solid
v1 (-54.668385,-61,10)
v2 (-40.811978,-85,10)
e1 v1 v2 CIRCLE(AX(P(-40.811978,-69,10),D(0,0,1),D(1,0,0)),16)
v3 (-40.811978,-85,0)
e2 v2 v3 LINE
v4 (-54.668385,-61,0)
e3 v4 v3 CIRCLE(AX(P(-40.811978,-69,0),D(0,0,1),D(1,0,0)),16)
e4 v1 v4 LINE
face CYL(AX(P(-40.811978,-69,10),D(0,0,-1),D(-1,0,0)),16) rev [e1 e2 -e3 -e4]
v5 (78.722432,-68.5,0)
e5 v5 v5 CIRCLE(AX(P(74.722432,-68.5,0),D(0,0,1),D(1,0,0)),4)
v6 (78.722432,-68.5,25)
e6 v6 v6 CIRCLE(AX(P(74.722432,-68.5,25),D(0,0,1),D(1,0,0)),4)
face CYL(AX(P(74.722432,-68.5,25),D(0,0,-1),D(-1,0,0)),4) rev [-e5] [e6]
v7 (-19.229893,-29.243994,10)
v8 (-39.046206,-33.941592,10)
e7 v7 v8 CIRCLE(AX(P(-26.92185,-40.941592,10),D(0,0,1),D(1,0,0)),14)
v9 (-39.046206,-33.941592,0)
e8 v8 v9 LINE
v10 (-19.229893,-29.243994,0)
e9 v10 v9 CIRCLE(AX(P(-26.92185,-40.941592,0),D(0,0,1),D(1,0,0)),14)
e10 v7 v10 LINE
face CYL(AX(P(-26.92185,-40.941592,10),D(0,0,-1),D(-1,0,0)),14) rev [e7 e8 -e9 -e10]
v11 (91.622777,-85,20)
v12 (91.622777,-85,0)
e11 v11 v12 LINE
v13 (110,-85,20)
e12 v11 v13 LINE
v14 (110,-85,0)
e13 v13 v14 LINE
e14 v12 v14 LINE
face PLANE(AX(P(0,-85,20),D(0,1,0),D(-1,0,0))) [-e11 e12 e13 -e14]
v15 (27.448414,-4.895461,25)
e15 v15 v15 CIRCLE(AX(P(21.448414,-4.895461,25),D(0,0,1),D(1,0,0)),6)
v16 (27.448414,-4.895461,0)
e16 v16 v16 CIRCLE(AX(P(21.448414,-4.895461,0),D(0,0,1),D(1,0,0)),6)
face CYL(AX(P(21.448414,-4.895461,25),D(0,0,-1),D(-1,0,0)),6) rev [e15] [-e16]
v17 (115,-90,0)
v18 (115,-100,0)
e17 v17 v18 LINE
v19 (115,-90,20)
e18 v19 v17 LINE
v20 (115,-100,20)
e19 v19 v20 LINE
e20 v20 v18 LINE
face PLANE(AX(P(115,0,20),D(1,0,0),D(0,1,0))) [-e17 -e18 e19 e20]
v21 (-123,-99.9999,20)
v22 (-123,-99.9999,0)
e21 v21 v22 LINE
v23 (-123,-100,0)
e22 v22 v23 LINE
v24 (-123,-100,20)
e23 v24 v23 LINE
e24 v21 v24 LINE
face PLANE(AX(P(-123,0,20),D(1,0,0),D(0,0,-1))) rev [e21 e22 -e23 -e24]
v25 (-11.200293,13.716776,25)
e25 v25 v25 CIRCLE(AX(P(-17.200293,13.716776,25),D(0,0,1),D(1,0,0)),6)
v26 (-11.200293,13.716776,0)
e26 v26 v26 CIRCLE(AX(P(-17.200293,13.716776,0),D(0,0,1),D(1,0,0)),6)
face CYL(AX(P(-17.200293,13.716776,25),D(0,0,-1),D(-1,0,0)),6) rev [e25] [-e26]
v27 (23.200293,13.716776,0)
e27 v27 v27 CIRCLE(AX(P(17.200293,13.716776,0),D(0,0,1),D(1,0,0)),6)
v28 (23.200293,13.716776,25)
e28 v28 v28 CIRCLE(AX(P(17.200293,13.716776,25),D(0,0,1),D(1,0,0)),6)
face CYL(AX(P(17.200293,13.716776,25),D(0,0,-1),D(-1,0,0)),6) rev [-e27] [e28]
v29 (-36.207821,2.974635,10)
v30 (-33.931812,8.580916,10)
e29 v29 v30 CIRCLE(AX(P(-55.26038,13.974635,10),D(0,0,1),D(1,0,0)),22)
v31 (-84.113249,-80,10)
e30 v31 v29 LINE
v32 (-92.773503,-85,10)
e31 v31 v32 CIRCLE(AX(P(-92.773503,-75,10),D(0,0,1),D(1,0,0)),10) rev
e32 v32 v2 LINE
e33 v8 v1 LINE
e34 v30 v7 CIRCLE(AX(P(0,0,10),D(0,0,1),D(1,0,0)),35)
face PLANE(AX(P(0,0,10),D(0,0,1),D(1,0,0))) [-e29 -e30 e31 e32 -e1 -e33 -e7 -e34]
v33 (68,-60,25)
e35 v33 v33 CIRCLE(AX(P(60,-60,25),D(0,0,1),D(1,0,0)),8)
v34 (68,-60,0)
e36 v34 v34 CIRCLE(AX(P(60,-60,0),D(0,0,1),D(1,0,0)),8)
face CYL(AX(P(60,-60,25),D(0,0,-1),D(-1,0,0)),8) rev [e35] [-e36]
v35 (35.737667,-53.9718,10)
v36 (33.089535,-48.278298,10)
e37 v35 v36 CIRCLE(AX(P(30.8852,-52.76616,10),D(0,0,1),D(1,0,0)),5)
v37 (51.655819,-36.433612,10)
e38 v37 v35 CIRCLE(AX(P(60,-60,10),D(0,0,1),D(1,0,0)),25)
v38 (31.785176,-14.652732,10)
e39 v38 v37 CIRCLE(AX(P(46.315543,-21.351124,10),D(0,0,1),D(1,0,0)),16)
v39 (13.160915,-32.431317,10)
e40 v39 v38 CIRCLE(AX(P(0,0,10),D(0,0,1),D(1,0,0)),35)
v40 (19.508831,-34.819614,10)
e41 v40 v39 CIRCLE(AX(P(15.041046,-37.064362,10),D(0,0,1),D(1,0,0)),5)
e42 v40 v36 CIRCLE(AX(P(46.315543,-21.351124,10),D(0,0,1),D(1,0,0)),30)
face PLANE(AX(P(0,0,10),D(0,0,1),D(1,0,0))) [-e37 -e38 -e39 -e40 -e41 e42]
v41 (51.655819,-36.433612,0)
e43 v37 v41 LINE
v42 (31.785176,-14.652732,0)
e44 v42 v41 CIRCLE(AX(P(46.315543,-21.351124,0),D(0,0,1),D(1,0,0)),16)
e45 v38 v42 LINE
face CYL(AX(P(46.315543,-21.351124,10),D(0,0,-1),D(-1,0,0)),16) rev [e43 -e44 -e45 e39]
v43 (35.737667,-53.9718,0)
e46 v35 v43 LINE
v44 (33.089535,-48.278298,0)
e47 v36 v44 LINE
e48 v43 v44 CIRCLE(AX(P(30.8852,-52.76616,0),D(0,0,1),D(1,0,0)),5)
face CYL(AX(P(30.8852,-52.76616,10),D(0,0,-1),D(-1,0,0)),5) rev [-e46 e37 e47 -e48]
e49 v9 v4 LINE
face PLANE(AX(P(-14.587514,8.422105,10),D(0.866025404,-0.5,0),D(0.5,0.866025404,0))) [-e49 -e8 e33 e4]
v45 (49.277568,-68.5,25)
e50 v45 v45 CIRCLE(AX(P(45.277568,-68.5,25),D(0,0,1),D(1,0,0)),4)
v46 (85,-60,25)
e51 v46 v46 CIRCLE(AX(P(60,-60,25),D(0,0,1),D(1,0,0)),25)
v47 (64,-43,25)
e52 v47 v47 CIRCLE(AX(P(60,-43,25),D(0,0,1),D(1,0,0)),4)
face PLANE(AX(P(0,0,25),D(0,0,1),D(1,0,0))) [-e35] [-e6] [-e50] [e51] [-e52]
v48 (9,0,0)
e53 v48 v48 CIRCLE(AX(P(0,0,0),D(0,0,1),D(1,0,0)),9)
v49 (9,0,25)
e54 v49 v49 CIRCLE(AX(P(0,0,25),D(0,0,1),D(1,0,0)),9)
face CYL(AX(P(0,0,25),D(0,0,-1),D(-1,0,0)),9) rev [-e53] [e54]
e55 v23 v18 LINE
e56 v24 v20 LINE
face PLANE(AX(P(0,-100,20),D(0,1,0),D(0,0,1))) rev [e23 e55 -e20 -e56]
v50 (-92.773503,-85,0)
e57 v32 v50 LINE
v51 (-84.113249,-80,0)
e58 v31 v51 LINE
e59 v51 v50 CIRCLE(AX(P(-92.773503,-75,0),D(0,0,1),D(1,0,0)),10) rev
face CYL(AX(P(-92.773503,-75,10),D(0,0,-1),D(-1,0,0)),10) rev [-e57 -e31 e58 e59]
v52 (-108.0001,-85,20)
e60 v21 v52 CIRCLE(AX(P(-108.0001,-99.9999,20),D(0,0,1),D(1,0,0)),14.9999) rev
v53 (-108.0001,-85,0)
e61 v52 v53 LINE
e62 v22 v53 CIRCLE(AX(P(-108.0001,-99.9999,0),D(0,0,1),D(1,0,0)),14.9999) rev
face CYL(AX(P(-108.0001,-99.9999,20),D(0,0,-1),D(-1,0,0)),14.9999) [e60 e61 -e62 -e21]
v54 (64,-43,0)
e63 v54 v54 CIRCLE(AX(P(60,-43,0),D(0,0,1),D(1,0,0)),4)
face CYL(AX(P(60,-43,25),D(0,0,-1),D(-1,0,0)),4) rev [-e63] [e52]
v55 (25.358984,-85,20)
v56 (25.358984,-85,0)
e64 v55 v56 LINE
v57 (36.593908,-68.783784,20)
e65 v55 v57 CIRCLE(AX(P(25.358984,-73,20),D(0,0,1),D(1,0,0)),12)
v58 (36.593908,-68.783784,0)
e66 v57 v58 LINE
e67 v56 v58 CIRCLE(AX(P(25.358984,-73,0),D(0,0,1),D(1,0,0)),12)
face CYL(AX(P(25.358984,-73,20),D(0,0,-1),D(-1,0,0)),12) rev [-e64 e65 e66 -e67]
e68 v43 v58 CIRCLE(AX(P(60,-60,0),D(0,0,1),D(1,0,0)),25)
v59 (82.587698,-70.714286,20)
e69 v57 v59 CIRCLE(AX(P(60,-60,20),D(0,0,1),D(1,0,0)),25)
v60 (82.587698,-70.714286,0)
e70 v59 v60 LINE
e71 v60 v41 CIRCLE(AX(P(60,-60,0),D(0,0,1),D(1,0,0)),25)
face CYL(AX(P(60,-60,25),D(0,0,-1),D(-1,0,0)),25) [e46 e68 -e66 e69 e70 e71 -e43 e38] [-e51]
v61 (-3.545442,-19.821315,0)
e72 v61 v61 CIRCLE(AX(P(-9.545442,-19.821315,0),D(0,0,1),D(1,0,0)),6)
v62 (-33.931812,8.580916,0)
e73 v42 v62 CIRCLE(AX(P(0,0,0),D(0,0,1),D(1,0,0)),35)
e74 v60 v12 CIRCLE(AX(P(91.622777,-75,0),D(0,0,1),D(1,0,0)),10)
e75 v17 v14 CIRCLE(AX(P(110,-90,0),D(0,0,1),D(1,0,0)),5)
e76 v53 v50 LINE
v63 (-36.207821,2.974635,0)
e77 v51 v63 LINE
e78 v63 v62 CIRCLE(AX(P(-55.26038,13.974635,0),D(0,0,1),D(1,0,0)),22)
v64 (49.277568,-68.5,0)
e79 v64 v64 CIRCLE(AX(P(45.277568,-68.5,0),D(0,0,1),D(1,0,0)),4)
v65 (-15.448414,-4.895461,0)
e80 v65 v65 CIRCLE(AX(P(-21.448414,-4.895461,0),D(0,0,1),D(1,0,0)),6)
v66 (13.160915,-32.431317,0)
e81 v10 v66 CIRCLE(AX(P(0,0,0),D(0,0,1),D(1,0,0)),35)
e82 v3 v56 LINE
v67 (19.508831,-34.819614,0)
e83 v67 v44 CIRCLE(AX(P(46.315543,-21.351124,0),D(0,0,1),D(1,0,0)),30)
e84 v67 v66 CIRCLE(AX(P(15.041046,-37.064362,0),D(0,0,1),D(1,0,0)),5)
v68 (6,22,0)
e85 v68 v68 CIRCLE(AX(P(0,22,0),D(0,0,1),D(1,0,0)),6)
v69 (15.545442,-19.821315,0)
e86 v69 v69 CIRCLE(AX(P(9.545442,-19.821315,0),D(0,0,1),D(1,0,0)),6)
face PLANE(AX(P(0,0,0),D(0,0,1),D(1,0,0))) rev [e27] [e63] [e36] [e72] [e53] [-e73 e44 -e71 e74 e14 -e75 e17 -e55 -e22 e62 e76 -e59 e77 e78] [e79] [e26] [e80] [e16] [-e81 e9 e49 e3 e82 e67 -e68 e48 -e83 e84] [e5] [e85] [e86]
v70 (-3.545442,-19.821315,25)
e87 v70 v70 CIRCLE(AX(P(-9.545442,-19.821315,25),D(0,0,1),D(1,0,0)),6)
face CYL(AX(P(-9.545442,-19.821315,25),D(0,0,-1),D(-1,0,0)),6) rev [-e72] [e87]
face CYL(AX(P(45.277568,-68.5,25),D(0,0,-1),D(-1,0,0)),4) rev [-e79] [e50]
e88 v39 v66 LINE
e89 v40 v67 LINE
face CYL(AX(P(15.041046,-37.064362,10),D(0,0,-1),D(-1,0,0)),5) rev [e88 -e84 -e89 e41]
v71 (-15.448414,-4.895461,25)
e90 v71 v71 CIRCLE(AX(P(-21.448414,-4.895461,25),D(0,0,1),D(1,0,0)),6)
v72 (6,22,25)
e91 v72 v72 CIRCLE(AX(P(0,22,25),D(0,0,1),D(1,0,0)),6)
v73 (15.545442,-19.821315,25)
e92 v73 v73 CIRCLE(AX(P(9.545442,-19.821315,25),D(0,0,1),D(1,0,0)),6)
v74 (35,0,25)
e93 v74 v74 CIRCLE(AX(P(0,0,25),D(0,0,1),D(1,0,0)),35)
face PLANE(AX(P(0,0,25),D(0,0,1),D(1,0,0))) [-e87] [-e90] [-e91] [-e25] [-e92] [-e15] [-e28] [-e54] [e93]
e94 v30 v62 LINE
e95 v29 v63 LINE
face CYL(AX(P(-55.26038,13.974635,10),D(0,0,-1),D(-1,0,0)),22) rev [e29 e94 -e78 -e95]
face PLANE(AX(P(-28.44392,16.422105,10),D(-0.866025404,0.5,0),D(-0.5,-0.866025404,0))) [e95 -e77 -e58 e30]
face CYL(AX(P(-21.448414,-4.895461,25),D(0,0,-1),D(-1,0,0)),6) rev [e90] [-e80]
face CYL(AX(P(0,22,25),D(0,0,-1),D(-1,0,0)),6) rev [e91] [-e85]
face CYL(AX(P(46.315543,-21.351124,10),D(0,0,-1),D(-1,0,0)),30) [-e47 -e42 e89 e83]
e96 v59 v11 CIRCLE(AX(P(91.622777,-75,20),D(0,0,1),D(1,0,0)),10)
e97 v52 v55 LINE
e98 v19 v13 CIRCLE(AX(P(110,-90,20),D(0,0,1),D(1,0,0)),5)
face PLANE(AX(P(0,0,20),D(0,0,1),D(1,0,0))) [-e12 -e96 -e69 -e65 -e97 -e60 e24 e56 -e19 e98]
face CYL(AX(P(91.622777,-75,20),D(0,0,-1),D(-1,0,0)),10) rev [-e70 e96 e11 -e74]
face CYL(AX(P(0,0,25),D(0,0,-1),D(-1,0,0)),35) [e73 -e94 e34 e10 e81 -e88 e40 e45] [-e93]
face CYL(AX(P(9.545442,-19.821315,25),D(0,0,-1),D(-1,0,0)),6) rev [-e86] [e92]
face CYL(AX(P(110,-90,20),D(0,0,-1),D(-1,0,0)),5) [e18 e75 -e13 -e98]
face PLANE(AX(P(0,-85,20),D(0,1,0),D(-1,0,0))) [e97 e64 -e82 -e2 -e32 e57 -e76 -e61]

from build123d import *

# Parameters (mm, degrees)
EXTRUDE_1_DEPTH   = 10
EXTRUDE_1_2_DEPTH = 10
EXTRUDE_2_DEPTH   = 20
SKETCH_1_4_R      = 35
SKETCH_1_4_R_2    = 6
SKETCH_1_4_R_3    = 9
SKETCH_1_4_R_4    = 25
SKETCH_1_4_R_5    = 8
SKETCH_1_4_R_6    = 4
EXTRUDE_3_DEPTH   = 25


# Read off the part's stored shape, not the designer's step: Бобышка-Вытянуть2
with BuildPart() as part:
    # Эскиз1 → Бобышка-Вытянуть1 (new body)
    with BuildSketch(Plane.XY):
        with BuildLine():
            ThreePointArc((-84.113248654, -80), (-87.773502692, -83.660254038), (-92.773502692, -85))
            Line((-92.773502692, -85), (-68.524791386, -85))
            Line((-68.524791386, -85), (-40.811978465, -85))
            ThreePointArc((-40.811978465, -85), (-54.668384925, -77), (-54.668384925, -61))
            Line((-54.668384925, -61), (-39.046205937, -33.941592266))
            ThreePointArc((-39.046205937, -33.941592266), (-30.151152872, -27.319125354), (-19.22989306, -29.243994476))
            ThreePointArc((-19.22989306, -29.243994476), (-32.622426184, -12.679799284), (-33.931812223, 8.580915992))
            ThreePointArc((-33.931812223, 8.580915992), (-34.876159455, 5.699155379), (-36.207821023, 2.974634616))
            Line((-36.207821023, 2.974634616), (-84.113248654, -80))
        make_face()
    extrude(amount=EXTRUDE_1_DEPTH)

    # Бобышка-Вытянуть2 outline → Бобышка-Вытянуть2 (add)
    with BuildSketch(Plane.XY):
        with BuildLine():
            ThreePointArc((91.622776602, -85), (83.171234054, -80.345224838), (82.587697573, -70.714285714))
            ThreePointArc((82.587697573, -70.714285714), (58.951595602, -84.978007291), (36.593908006, -68.783783784))
            ThreePointArc((36.593908006, -68.783783784), (35.222923087, -79.833937569), (25.358983849, -85))
            Line((25.358983849, -85), (-108.0001, -85))
            ThreePointArc((-108.0001, -85), (-118.606631007, -89.393368993), (-123, -99.9999))
            Line((-123, -99.9999), (115, -100))
            Line((115, -100), (115, -90))
            ThreePointArc((115, -90), (113.535533906, -86.464466094), (110, -85))
            Line((110, -85), (91.622776602, -85))
        make_face()
    extrude(amount=EXTRUDE_2_DEPTH)



with BuildPart() as body_2:
    # Эскиз1 → Extrude 1 2 (new body)
    with BuildSketch(Plane.XY):
        with BuildLine():
            ThreePointArc((33.089534913, -48.278298017), (35.418808442, -50.657512303), (35.737666875, -53.971800326))
            ThreePointArc((35.737666875, -53.971800326), (41.48802535, -43.198012184), (51.655818839, -36.433612056))
            ThreePointArc((51.655818839, -36.433612056), (34.49538534, -32.134623915), (31.785176497, -14.652732))
            ThreePointArc((31.785176497, -14.652732), (24.167277738, -25.316845908), (13.16091541, -32.431316741))
            ThreePointArc((13.16091541, -32.431316741), (16.80172204, -32.384616215), (19.508831427, -34.819613673))
            ThreePointArc((19.508831427, -34.819613673), (25.198282119, -42.659837887), (33.089534913, -48.278298017))
        make_face()
    extrude(amount=EXTRUDE_1_2_DEPTH)


with BuildPart() as part_1:
    add(part.part)

    add(body_2.part)  # Бобышка-Вытянуть3 merges body 2
    # Эскиз1<4> → Бобышка-Вытянуть3 (add)
    # profile 1 of 2: a face of its own
    with BuildSketch(Plane.XY):
        with Locations(Location((0, 0, 0), (0, 0, 165.808177005))):
            Circle(SKETCH_1_4_R)
        with Locations((-17.200292614, 13.716775641)):
            Circle(SKETCH_1_4_R_2, mode=Mode.SUBTRACT)
        with Locations((-21.448414068, -4.895460547)):
            Circle(SKETCH_1_4_R_2, mode=Mode.SUBTRACT)
        with Locations((-9.545442261, -19.821315094)):
            Circle(SKETCH_1_4_R_2, mode=Mode.SUBTRACT)
        with Locations((9.545442261, -19.821315094)):
            Circle(SKETCH_1_4_R_2, mode=Mode.SUBTRACT)
        with Locations((21.448414068, -4.895460547)):
            Circle(SKETCH_1_4_R_2, mode=Mode.SUBTRACT)
        with Locations((17.200292614, 13.716775641)):
            Circle(SKETCH_1_4_R_2, mode=Mode.SUBTRACT)
        with Locations((0, 22)):
            Circle(SKETCH_1_4_R_2, mode=Mode.SUBTRACT)
        Circle(SKETCH_1_4_R_3, mode=Mode.SUBTRACT)
    # profile 2 of 2: a face of its own
    with BuildSketch(Plane.XY):
        with Locations(Location((60, -60, 0), (0, 0, 166.046875379))):
            Circle(SKETCH_1_4_R_4)
        with Locations((60, -60)):
            Circle(SKETCH_1_4_R_5, mode=Mode.SUBTRACT)
        with Locations((45.277568136, -68.5)):
            Circle(SKETCH_1_4_R_6, mode=Mode.SUBTRACT)
        with Locations((74.722431864, -68.5)):
            Circle(SKETCH_1_4_R_6, mode=Mode.SUBTRACT)
        with Locations((60, -43)):
            Circle(SKETCH_1_4_R_6, mode=Mode.SUBTRACT)
    extrude(amount=EXTRUDE_3_DEPTH)


solid = part_1.part
